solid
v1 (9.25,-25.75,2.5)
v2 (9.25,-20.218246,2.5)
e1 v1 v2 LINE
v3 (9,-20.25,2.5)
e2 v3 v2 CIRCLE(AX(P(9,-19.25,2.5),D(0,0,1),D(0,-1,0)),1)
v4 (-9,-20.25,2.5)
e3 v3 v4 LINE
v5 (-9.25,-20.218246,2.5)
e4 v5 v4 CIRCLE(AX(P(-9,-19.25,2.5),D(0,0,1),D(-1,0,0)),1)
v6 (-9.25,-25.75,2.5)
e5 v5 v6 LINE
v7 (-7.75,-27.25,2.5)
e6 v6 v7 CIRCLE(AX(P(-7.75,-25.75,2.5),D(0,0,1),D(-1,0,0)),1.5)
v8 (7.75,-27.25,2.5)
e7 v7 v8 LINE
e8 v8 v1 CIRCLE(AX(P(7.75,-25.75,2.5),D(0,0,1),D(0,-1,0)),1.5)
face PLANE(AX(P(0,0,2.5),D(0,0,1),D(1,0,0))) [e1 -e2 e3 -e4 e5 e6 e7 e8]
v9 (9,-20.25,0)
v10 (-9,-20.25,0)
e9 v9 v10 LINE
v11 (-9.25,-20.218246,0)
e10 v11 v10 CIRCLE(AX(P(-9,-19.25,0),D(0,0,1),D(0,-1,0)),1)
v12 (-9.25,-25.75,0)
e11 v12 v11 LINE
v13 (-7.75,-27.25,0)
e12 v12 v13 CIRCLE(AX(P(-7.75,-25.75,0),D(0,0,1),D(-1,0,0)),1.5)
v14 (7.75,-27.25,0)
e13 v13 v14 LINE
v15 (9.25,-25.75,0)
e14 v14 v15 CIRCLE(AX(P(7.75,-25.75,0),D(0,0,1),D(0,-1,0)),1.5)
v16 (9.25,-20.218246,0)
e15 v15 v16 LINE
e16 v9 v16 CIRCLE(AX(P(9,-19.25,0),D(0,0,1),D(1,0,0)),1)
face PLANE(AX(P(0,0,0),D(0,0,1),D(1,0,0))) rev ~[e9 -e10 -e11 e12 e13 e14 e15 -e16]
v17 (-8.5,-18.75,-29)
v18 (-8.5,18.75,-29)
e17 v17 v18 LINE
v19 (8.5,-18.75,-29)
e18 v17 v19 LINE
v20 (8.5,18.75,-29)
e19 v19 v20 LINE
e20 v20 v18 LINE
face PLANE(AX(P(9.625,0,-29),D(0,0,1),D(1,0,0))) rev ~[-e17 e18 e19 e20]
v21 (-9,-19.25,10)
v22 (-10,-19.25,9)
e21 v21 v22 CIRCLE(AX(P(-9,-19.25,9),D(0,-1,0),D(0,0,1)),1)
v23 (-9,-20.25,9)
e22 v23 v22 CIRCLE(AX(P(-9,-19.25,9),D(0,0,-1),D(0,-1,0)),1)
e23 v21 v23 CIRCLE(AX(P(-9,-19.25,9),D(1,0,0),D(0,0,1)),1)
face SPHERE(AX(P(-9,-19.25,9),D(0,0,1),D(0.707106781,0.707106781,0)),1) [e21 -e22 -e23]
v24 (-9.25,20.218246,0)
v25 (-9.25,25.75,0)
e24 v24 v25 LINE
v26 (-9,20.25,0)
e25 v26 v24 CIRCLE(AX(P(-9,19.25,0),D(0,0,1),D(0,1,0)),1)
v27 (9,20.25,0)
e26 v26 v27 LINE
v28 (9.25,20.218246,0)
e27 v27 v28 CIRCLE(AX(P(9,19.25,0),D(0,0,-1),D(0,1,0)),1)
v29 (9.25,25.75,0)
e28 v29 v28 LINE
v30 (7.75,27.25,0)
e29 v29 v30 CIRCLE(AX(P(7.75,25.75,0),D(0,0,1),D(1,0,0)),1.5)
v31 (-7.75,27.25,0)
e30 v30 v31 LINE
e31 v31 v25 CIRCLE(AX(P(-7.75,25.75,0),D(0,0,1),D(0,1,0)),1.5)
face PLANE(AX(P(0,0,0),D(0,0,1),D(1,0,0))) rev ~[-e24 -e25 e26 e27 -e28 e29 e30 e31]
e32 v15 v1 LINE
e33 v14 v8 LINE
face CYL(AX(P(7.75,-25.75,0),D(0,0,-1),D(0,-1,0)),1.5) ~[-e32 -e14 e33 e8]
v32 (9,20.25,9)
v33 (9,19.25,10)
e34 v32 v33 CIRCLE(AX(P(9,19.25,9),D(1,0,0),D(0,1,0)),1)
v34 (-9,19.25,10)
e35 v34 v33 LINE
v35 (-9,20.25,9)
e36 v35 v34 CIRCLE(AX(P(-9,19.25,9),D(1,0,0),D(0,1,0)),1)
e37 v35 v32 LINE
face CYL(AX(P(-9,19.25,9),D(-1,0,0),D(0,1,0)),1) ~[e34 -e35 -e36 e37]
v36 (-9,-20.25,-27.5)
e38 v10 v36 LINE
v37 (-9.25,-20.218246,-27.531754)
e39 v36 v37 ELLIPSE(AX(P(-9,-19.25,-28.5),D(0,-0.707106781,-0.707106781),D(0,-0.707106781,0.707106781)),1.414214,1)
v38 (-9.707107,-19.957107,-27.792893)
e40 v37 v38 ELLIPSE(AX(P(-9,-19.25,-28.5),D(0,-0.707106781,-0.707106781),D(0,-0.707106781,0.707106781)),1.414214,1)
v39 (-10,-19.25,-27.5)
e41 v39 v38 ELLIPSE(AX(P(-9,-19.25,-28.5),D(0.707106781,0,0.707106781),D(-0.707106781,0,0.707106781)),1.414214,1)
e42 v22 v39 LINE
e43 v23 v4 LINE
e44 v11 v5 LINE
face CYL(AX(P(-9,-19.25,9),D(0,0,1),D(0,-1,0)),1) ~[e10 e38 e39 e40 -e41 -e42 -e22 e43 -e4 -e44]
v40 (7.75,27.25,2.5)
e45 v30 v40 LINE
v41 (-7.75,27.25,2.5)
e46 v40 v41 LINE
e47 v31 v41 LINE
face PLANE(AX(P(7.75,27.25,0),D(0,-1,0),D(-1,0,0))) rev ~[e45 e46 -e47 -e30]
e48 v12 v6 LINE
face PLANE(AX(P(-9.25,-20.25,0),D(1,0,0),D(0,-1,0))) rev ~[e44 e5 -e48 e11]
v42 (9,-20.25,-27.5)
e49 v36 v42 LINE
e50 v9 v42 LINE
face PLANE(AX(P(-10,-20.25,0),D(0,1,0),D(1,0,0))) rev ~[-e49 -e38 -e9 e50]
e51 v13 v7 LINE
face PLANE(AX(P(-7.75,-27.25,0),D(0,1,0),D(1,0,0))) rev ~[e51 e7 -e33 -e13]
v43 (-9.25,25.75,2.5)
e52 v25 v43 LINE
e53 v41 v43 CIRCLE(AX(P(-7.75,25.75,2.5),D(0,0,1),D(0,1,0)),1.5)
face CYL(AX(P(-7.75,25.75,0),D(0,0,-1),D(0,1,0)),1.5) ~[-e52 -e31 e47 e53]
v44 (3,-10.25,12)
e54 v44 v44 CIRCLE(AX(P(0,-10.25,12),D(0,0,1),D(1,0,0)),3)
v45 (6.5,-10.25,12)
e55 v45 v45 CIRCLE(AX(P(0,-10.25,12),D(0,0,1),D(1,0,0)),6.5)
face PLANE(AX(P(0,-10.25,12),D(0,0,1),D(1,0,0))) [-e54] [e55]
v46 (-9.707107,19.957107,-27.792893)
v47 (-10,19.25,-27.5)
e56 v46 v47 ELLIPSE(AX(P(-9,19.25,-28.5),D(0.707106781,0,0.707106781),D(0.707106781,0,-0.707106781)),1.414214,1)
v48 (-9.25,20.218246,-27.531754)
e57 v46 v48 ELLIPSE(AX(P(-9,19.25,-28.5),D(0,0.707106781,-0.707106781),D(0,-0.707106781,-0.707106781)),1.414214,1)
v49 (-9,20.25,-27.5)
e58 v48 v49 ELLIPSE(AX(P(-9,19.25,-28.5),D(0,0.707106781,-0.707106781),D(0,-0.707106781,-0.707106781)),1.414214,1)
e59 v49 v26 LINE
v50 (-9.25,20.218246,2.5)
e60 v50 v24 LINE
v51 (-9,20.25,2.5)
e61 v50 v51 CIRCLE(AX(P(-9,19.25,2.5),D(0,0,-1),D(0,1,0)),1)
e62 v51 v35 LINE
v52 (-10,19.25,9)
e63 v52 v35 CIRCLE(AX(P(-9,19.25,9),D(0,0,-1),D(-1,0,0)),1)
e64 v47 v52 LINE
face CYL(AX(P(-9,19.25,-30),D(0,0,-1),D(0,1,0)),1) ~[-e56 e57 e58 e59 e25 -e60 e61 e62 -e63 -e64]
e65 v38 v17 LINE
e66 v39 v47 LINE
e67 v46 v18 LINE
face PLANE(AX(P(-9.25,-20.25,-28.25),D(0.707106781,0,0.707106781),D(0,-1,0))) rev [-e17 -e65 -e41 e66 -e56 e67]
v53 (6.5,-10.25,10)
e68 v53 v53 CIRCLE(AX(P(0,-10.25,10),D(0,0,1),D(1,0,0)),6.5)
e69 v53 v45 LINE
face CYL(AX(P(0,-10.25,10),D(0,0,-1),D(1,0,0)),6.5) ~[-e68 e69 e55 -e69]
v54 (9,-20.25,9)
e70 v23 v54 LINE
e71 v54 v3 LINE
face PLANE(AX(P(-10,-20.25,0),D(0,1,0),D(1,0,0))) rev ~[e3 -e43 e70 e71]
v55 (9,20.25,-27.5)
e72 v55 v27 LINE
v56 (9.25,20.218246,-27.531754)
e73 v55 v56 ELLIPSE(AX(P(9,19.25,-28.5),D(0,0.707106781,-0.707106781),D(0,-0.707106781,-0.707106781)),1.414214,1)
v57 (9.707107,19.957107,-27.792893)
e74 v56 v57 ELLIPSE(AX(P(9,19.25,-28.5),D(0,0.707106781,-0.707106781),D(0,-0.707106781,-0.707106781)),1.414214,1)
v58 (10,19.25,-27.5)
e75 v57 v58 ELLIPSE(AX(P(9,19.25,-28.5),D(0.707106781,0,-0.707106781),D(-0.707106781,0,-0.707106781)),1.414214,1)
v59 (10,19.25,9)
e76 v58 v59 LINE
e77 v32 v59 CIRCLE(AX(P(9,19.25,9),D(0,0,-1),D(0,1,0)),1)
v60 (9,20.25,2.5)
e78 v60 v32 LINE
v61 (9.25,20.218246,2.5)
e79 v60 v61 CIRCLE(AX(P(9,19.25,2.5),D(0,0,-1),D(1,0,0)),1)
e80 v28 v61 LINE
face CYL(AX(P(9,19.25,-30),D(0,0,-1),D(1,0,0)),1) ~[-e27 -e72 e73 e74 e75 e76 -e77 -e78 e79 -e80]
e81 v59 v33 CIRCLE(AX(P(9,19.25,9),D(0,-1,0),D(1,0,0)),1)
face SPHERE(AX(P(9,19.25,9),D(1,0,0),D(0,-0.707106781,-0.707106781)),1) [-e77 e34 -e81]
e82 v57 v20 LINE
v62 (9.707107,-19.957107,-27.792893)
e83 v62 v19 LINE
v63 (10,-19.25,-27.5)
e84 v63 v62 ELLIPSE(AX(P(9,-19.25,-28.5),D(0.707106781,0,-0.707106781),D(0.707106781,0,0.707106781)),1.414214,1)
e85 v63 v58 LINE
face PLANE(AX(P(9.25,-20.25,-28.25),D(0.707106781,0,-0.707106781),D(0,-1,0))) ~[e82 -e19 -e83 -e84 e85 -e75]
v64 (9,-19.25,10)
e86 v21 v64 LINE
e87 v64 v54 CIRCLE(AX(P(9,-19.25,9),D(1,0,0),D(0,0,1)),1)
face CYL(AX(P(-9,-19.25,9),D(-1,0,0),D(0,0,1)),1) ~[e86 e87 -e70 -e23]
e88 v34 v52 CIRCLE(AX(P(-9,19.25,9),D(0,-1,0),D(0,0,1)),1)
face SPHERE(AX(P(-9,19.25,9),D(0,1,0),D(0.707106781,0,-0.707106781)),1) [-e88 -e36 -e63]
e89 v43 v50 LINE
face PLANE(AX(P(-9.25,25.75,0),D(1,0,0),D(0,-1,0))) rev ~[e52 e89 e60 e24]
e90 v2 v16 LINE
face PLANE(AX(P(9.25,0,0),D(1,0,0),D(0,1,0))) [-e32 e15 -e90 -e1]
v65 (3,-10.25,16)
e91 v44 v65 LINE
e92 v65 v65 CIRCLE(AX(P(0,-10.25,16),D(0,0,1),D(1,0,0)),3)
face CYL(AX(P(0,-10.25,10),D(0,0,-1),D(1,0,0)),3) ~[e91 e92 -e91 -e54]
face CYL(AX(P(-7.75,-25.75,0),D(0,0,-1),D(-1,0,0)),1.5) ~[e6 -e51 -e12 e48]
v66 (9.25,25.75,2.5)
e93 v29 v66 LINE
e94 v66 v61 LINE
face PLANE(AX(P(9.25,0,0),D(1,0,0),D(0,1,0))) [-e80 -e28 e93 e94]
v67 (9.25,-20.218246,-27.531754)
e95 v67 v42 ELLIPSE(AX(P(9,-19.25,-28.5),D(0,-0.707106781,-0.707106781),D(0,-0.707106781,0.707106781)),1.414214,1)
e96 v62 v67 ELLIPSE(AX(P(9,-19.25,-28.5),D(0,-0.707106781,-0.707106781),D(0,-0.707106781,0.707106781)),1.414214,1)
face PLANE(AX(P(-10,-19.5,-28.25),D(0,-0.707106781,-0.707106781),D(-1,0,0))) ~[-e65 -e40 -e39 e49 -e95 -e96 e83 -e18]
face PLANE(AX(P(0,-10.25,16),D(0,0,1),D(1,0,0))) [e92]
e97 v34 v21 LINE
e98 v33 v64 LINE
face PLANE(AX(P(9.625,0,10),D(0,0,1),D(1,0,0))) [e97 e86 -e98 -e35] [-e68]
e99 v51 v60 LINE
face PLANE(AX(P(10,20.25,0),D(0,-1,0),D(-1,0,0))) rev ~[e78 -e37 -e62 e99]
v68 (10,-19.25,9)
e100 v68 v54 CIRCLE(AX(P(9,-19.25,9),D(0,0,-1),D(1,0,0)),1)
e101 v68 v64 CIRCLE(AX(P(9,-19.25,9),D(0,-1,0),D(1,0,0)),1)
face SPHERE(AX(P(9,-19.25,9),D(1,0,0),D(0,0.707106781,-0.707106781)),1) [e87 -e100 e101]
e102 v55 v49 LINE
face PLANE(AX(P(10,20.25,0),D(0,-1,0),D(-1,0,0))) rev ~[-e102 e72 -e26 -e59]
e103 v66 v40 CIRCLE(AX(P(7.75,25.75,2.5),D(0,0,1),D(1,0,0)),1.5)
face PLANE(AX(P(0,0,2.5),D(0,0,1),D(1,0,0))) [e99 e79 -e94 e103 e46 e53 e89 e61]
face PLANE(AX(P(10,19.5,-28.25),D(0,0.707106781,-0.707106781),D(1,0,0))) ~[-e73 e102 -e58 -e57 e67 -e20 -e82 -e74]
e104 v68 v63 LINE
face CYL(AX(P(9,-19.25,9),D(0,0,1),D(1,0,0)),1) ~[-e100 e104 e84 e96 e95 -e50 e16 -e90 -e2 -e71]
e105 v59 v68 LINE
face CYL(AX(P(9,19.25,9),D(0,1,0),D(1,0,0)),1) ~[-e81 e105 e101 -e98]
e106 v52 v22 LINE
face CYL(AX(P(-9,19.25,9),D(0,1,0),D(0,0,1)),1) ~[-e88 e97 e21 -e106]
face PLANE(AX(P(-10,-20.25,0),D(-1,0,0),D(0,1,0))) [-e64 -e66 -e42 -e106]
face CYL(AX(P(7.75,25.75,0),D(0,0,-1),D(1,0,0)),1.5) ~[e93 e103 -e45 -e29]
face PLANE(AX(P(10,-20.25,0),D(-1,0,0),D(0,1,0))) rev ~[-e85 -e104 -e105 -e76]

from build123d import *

# Parameters (mm, degrees)
F0_W          = 0.75
F0_H          = 40.5
F0_W_2        = 18.5
F1_DEPTH      = 29
F1_DEPTH_BACK = 10
F2_DEPTH      = 2.5
F3_R          = 6.5
F3_R_2        = 3
F4_DEPTH      = 2
F5_DEPTH      = 6
F6_SIZE       = 1.5
F7_T1_DEPTH   = 38.5
F7_T3_DEPTH   = 18
F7_S7_W       = 1
F7_S7_H       = 1
F7_T8_DEPTH   = 1
F7_S13_W      = 1
F7_S13_H      = 1
F7_T14_DEPTH  = 1
F7_S19_W      = 1
F7_S19_H      = 1
F7_T20_DEPTH  = 1
F7_S25_W      = 1
F7_S25_H      = 1
F7_T26_DEPTH  = 1
F7_T32_DEPTH  = 39
F7_T38_DEPTH  = 39
F7_T44_DEPTH  = 39
F7_T51_DEPTH  = 39
F7_T57_DEPTH  = 39
F7_T63_DEPTH  = 39
F7_T69_DEPTH  = 39
F7_T75_DEPTH  = 39
F7_T82_DEPTH  = 39
F7_T88_DEPTH  = 39
F7_T94_DEPTH  = 39
F7_T100_DEPTH = 39
F7_T106_DEPTH = 39
F7_T113_DEPTH = 39
F7_T119_DEPTH = 39
F7_T125_DEPTH = 39
F7_T131_DEPTH = 39
F7_T137_DEPTH = 39
F7_T144_DEPTH = 39
F7_T150_DEPTH = 39


# Not quite as in the source:
# - a fillet or chamfer that OpenCascade refuses, or shapes differently, is made with other operations: its cross-section is extruded or revolved along the edge and cut away or added


with BuildPart() as f1:
    # F0 (on Top) → F1 (new body, two sides)
    with BuildSketch(Plane.XY) as f1_sk:
        with Locations((9.625, 0)):
            Rectangle(F0_W, F0_H)
        Rectangle(F0_W_2, F0_H)
        with Locations((-9.625, 0)):
            Rectangle(F0_W, F0_H)
    extrude(amount=-F1_DEPTH)
    extrude(f1_sk.sketch, amount=F1_DEPTH_BACK)

    # F0 (on Top) → F2 (join)
    with BuildSketch(Plane.XY):
        with BuildLine():
            Line((9.25, -25.75), (9.25, -20.25))
            Line((9.25, -20.25), (-9.25, -20.25))
            Line((-9.25, -20.25), (-9.25, -25.75))
            ThreePointArc((-9.25, -25.75), (-8.8106601718, -26.8106601718), (-7.75, -27.25))
            Line((-7.75, -27.25), (7.75, -27.25))
            ThreePointArc((7.75, -27.25), (8.8106601718, -26.8106601718), (9.25, -25.75))
        make_face()
        with BuildLine():
            Line((-9.25, 20.25), (9.25, 20.25))
            Line((9.25, 20.25), (9.25, 25.75))
            ThreePointArc((9.25, 25.75), (8.8106601718, 26.8106601718), (7.75, 27.25))
            Line((7.75, 27.25), (-7.75, 27.25))
            ThreePointArc((-7.75, 27.25), (-8.8106601718, 26.8106601718), (-9.25, 25.75))
            Line((-9.25, 25.75), (-9.25, 20.25))
        make_face()
    extrude(amount=F2_DEPTH)

    # F3 (on face) → F4 (join)
    with BuildSketch(Plane.XY.offset(10)):
        with Locations((0, -10.25)):
            Circle(F3_R)
        with Locations((0, -10.25)):
            Circle(F3_R_2, mode=Mode.SUBTRACT)
    extrude(amount=F4_DEPTH)

    # F3 (on face) → F5 (join)
    with BuildSketch(Plane.XY.offset(10)):
        with Locations((0, -10.25)):
            Circle(F3_R_2)
    extrude(amount=F5_DEPTH)

    # F6
    f6_edges = [f1.edges().sort_by_distance(p)[0] for p in [
        (10, 0, -29),
        (0, 20.25, -29),
        (-10, 0, -29),
        (0, -20.25, -29),
    ]]
    chamfer(f6_edges, length=F6_SIZE)

    # F7: fillet of radius 1 on 8 edges, made by hand

    # F7_s2 → F7_t1 (cut)
    with BuildSketch(Plane.XZ.offset(-19.25)):
        with BuildLine():
            ThreePointArc((-9, 10), (-9.7071067812, 9.7071067812), (-10, 9))
            Line((-10, 9), (-10, 10))
            Line((-10, 10), (-9, 10))
        make_face()
        with BuildLine():
            ThreePointArc((10, 9), (9.7071067812, 9.7071067812), (9, 10))
            Line((9, 10), (10, 10))
            Line((10, 10), (10, 9))
        make_face()
    extrude(amount=F7_T1_DEPTH, mode=Mode.SUBTRACT)

    # F7_s4 → F7_t3 (cut)
    with BuildSketch(Plane.YZ.offset(-9)):
        with BuildLine():
            ThreePointArc((20.25, 9), (19.9571067812, 9.7071067812), (19.25, 10))
            Line((19.25, 10), (20.25, 10))
            Line((20.25, 10), (20.25, 9))
        make_face()
        with BuildLine():
            ThreePointArc((-19.25, 10), (-19.9571067812, 9.7071067812), (-20.25, 9))
            Line((-20.25, 9), (-20.25, 10))
            Line((-20.25, 10), (-19.25, 10))
        make_face()
    extrude(amount=F7_T3_DEPTH, mode=Mode.SUBTRACT)


with BuildPart() as f7_tool6:
    # F7_s7 → F7_t8 (new body)
    with BuildSketch(Plane.XZ.offset(-19.25)):
        with Locations((-9.5, 9.5)):
            Rectangle(F7_S7_W, F7_S7_H)
    extrude(amount=-F7_T8_DEPTH)

    # F7_s9 → F7_t10 (revolve, cut)
    with BuildSketch(Plane(origin=(-9, 19.25, 9), x_dir=(0.7071067812, 0, -0.7071067812), z_dir=(0.7071067812, 0, 0.7071067812))):
        with BuildLine():
            ThreePointArc((0, -1), (1, 0), (0, 1))
            Line((0, 1), (0, -1))
        make_face()
    revolve(axis=Axis((-9, 19.25, 9), (0, 1, 0)), mode=Mode.SUBTRACT)


with BuildPart() as f1_1:
    add(f1.part)

    # F7_t5: cut F7_tool6
    add(f7_tool6.part, mode=Mode.SUBTRACT)


with BuildPart() as f7_tool12:
    # F7_s13 → F7_t14 (new body)
    with BuildSketch(Plane.XY.offset(9)):
        with Locations((-9.5, -19.75)):
            Rectangle(F7_S13_W, F7_S13_H)
    extrude(amount=F7_T14_DEPTH)

    # F7_s15 → F7_t16 (revolve, cut)
    with BuildSketch(Plane(origin=(-9, -19.25, 9), x_dir=(0.7071067812, 0.7071067812, 0), z_dir=(0.7071067812, -0.7071067812, 0))):
        with BuildLine():
            ThreePointArc((0, -1), (1, 0), (0, 1))
            Line((0, 1), (0, -1))
        make_face()
    revolve(axis=Axis((-9, -19.25, 9), (0, 0, 1)), mode=Mode.SUBTRACT)


with BuildPart() as f1_2:
    add(f1_1.part)

    # F7_t11: cut F7_tool12
    add(f7_tool12.part, mode=Mode.SUBTRACT)


with BuildPart() as f7_tool18:
    # F7_s19 → F7_t20 (new body)
    with BuildSketch(Plane.YZ.offset(9)):
        with Locations((19.75, 9.5)):
            Rectangle(F7_S19_W, F7_S19_H)
    extrude(amount=F7_T20_DEPTH)

    # F7_s21 → F7_t22 (revolve, cut)
    with BuildSketch(Plane(origin=(9, 19.25, 9), x_dir=(0, -0.7071067812, -0.7071067812), z_dir=(0, -0.7071067812, 0.7071067812))):
        with BuildLine():
            ThreePointArc((0, -1), (1, 0), (0, 1))
            Line((0, 1), (0, -1))
        make_face()
    revolve(axis=Axis((9, 19.25, 9), (1, 0, 0)), mode=Mode.SUBTRACT)


with BuildPart() as f1_3:
    add(f1_2.part)

    # F7_t17: cut F7_tool18
    add(f7_tool18.part, mode=Mode.SUBTRACT)


with BuildPart() as f7_tool24:
    # F7_s25 → F7_t26 (new body)
    with BuildSketch(Plane.YZ.offset(9)):
        with Locations((-19.75, 9.5)):
            Rectangle(F7_S25_W, F7_S25_H)
    extrude(amount=F7_T26_DEPTH)

    # F7_s27 → F7_t28 (revolve, cut)
    with BuildSketch(Plane(origin=(9, -19.25, 9), x_dir=(0, 0.7071067812, -0.7071067812), z_dir=(0, -0.7071067812, -0.7071067812))):
        with BuildLine():
            ThreePointArc((0, -1), (1, 0), (0, 1))
            Line((0, 1), (0, -1))
        make_face()
    revolve(axis=Axis((9, -19.25, 9), (1, 0, 0)), mode=Mode.SUBTRACT)


with BuildPart() as f1_4:
    add(f1_3.part)

    # F7_t23: cut F7_tool24
    add(f7_tool24.part, mode=Mode.SUBTRACT)


with BuildPart() as f7_tool30:
    # F7_s31 → F7_t32 (new body)
    with BuildSketch(Plane.XY.offset(-30)):
        with BuildLine():
            ThreePointArc((10, 19.25), (9.7071067812, 19.9571067812), (9, 20.25))
            Line((9, 20.25), (10, 20.25))
            Line((10, 20.25), (10, 19.25))
        make_face()
    extrude(amount=F7_T32_DEPTH)

    split(bisect_by=Plane.YZ.offset(9.25), keep=Keep.TOP)

    split(bisect_by=Plane.XY, keep=Keep.BOTTOM)


with BuildPart() as f1_5:
    add(f1_4.part)

    # F7_t29: cut F7_tool30
    add(f7_tool30.part, mode=Mode.SUBTRACT)


with BuildPart() as f7_tool36:
    # F7_s37 → F7_t38 (new body)
    with BuildSketch(Plane.XY.offset(-30)):
        with BuildLine():
            ThreePointArc((10, 19.25), (9.7071067812, 19.9571067812), (9, 20.25))
            Line((9, 20.25), (10, 20.25))
            Line((10, 20.25), (10, 19.25))
        make_face()
    extrude(amount=F7_T38_DEPTH)

    split(bisect_by=Plane.YZ.offset(9.25), keep=Keep.BOTTOM)

    split(bisect_by=Plane.XY, keep=Keep.BOTTOM)


with BuildPart() as f1_6:
    add(f1_5.part)

    # F7_t35: cut F7_tool36
    add(f7_tool36.part, mode=Mode.SUBTRACT)


with BuildPart() as f7_tool42:
    # F7_s43 → F7_t44 (new body)
    with BuildSketch(Plane.XY.offset(-30)):
        with BuildLine():
            ThreePointArc((10, 19.25), (9.7071067812, 19.9571067812), (9, 20.25))
            Line((9, 20.25), (10, 20.25))
            Line((10, 20.25), (10, 19.25))
        make_face()
    extrude(amount=F7_T44_DEPTH)

    split(bisect_by=Plane.XY.offset(2.5), keep=Keep.BOTTOM)

    split(bisect_by=Plane.YZ.offset(9.25), keep=Keep.TOP)

    split(bisect_by=Plane.XY, keep=Keep.TOP)


with BuildPart() as f1_7:
    add(f1_6.part)

    # F7_t41: cut F7_tool42
    add(f7_tool42.part, mode=Mode.SUBTRACT)


with BuildPart() as f7_tool49:
    # F7_s50 → F7_t51 (new body)
    with BuildSketch(Plane.XY.offset(-30)):
        with BuildLine():
            ThreePointArc((10, 19.25), (9.7071067812, 19.9571067812), (9, 20.25))
            Line((9, 20.25), (10, 20.25))
            Line((10, 20.25), (10, 19.25))
        make_face()
    extrude(amount=F7_T51_DEPTH)

    split(bisect_by=Plane.XY.offset(2.5), keep=Keep.TOP)

    split(bisect_by=Plane.YZ.offset(9.25), keep=Keep.TOP)


with BuildPart() as f1_8:
    add(f1_7.part)

    # F7_t48: cut F7_tool49
    add(f7_tool49.part, mode=Mode.SUBTRACT)


with BuildPart() as f7_tool55:
    # F7_s56 → F7_t57 (new body)
    with BuildSketch(Plane.XY.offset(-30)):
        with BuildLine():
            ThreePointArc((10, 19.25), (9.7071067812, 19.9571067812), (9, 20.25))
            Line((9, 20.25), (10, 20.25))
            Line((10, 20.25), (10, 19.25))
        make_face()
    extrude(amount=F7_T57_DEPTH)

    split(bisect_by=Plane.XY.offset(2.5), keep=Keep.TOP)

    split(bisect_by=Plane.YZ.offset(9.25), keep=Keep.BOTTOM)


with BuildPart() as f1_9:
    add(f1_8.part)

    # F7_t54: cut F7_tool55
    add(f7_tool55.part, mode=Mode.SUBTRACT)


with BuildPart() as f7_tool61:
    # F7_s62 → F7_t63 (new body)
    with BuildSketch(Plane.XY.offset(9)):
        with BuildLine():
            ThreePointArc((-9, -20.25), (-9.7071067812, -19.9571067812), (-10, -19.25))
            Line((-10, -19.25), (-10, -20.25))
            Line((-10, -20.25), (-9, -20.25))
        make_face()
    extrude(amount=-F7_T63_DEPTH)

    split(bisect_by=Plane.XY.offset(2.5), keep=Keep.TOP)

    split(bisect_by=Plane.YZ.offset(-9.25), keep=Keep.TOP)


with BuildPart() as f1_10:
    add(f1_9.part)

    # F7_t60: cut F7_tool61
    add(f7_tool61.part, mode=Mode.SUBTRACT)


with BuildPart() as f7_tool67:
    # F7_s68 → F7_t69 (new body)
    with BuildSketch(Plane.XY.offset(9)):
        with BuildLine():
            ThreePointArc((-9, -20.25), (-9.7071067812, -19.9571067812), (-10, -19.25))
            Line((-10, -19.25), (-10, -20.25))
            Line((-10, -20.25), (-9, -20.25))
        make_face()
    extrude(amount=-F7_T69_DEPTH)

    split(bisect_by=Plane.XY.offset(2.5), keep=Keep.TOP)

    split(bisect_by=Plane.YZ.offset(-9.25), keep=Keep.BOTTOM)


with BuildPart() as f1_11:
    add(f1_10.part)

    # F7_t66: cut F7_tool67
    add(f7_tool67.part, mode=Mode.SUBTRACT)


with BuildPart() as f7_tool73:
    # F7_s74 → F7_t75 (new body)
    with BuildSketch(Plane.XY.offset(9)):
        with BuildLine():
            ThreePointArc((-9, -20.25), (-9.7071067812, -19.9571067812), (-10, -19.25))
            Line((-10, -19.25), (-10, -20.25))
            Line((-10, -20.25), (-9, -20.25))
        make_face()
    extrude(amount=-F7_T75_DEPTH)

    split(bisect_by=Plane.XY.offset(2.5), keep=Keep.BOTTOM)

    split(bisect_by=Plane.YZ.offset(-9.25), keep=Keep.BOTTOM)

    split(bisect_by=Plane.XY, keep=Keep.TOP)


with BuildPart() as f1_12:
    add(f1_11.part)

    # F7_t72: cut F7_tool73
    add(f7_tool73.part, mode=Mode.SUBTRACT)


with BuildPart() as f7_tool80:
    # F7_s81 → F7_t82 (new body)
    with BuildSketch(Plane.XY.offset(9)):
        with BuildLine():
            ThreePointArc((-9, -20.25), (-9.7071067812, -19.9571067812), (-10, -19.25))
            Line((-10, -19.25), (-10, -20.25))
            Line((-10, -20.25), (-9, -20.25))
        make_face()
    extrude(amount=-F7_T82_DEPTH)

    split(bisect_by=Plane.YZ.offset(-9.25), keep=Keep.TOP)

    split(bisect_by=Plane.XY, keep=Keep.BOTTOM)


with BuildPart() as f1_13:
    add(f1_12.part)

    # F7_t79: cut F7_tool80
    add(f7_tool80.part, mode=Mode.SUBTRACT)


with BuildPart() as f7_tool86:
    # F7_s87 → F7_t88 (new body)
    with BuildSketch(Plane.XY.offset(9)):
        with BuildLine():
            ThreePointArc((-9, -20.25), (-9.7071067812, -19.9571067812), (-10, -19.25))
            Line((-10, -19.25), (-10, -20.25))
            Line((-10, -20.25), (-9, -20.25))
        make_face()
    extrude(amount=-F7_T88_DEPTH)

    split(bisect_by=Plane.YZ.offset(-9.25), keep=Keep.BOTTOM)

    split(bisect_by=Plane.XY, keep=Keep.BOTTOM)


with BuildPart() as f1_14:
    add(f1_13.part)

    # F7_t85: cut F7_tool86
    add(f7_tool86.part, mode=Mode.SUBTRACT)


with BuildPart() as f7_tool92:
    # F7_s93 → F7_t94 (new body)
    with BuildSketch(Plane.XY.offset(9)):
        with BuildLine():
            ThreePointArc((10, -19.25), (9.7071067812, -19.9571067812), (9, -20.25))
            Line((9, -20.25), (10, -20.25))
            Line((10, -20.25), (10, -19.25))
        make_face()
    extrude(amount=-F7_T94_DEPTH)

    split(bisect_by=Plane.YZ.offset(9.25), keep=Keep.TOP)

    split(bisect_by=Plane.XY.offset(2.5), keep=Keep.TOP)


with BuildPart() as f1_15:
    add(f1_14.part)

    # F7_t91: cut F7_tool92
    add(f7_tool92.part, mode=Mode.SUBTRACT)


with BuildPart() as f7_tool98:
    # F7_s99 → F7_t100 (new body)
    with BuildSketch(Plane.XY.offset(9)):
        with BuildLine():
            ThreePointArc((10, -19.25), (9.7071067812, -19.9571067812), (9, -20.25))
            Line((9, -20.25), (10, -20.25))
            Line((10, -20.25), (10, -19.25))
        make_face()
    extrude(amount=-F7_T100_DEPTH)

    split(bisect_by=Plane.YZ.offset(9.25), keep=Keep.BOTTOM)

    split(bisect_by=Plane.XY.offset(2.5), keep=Keep.TOP)


with BuildPart() as f1_16:
    add(f1_15.part)

    # F7_t97: cut F7_tool98
    add(f7_tool98.part, mode=Mode.SUBTRACT)


with BuildPart() as f7_tool104:
    # F7_s105 → F7_t106 (new body)
    with BuildSketch(Plane.XY.offset(9)):
        with BuildLine():
            ThreePointArc((10, -19.25), (9.7071067812, -19.9571067812), (9, -20.25))
            Line((9, -20.25), (10, -20.25))
            Line((10, -20.25), (10, -19.25))
        make_face()
    extrude(amount=-F7_T106_DEPTH)

    split(bisect_by=Plane.YZ.offset(9.25), keep=Keep.TOP)

    split(bisect_by=Plane.XY.offset(2.5), keep=Keep.BOTTOM)

    split(bisect_by=Plane.XY, keep=Keep.TOP)


with BuildPart() as f1_17:
    add(f1_16.part)

    # F7_t103: cut F7_tool104
    add(f7_tool104.part, mode=Mode.SUBTRACT)


with BuildPart() as f7_tool111:
    # F7_s112 → F7_t113 (new body)
    with BuildSketch(Plane.XY.offset(9)):
        with BuildLine():
            ThreePointArc((10, -19.25), (9.7071067812, -19.9571067812), (9, -20.25))
            Line((9, -20.25), (10, -20.25))
            Line((10, -20.25), (10, -19.25))
        make_face()
    extrude(amount=-F7_T113_DEPTH)

    split(bisect_by=Plane.YZ.offset(9.25), keep=Keep.TOP)

    split(bisect_by=Plane.XY, keep=Keep.BOTTOM)


with BuildPart() as f1_18:
    add(f1_17.part)

    # F7_t110: cut F7_tool111
    add(f7_tool111.part, mode=Mode.SUBTRACT)


with BuildPart() as f7_tool117:
    # F7_s118 → F7_t119 (new body)
    with BuildSketch(Plane.XY.offset(9)):
        with BuildLine():
            ThreePointArc((10, -19.25), (9.7071067812, -19.9571067812), (9, -20.25))
            Line((9, -20.25), (10, -20.25))
            Line((10, -20.25), (10, -19.25))
        make_face()
    extrude(amount=-F7_T119_DEPTH)

    split(bisect_by=Plane.YZ.offset(9.25), keep=Keep.BOTTOM)

    split(bisect_by=Plane.XY, keep=Keep.BOTTOM)


with BuildPart() as f1_19:
    add(f1_18.part)

    # F7_t116: cut F7_tool117
    add(f7_tool117.part, mode=Mode.SUBTRACT)


with BuildPart() as f7_tool123:
    # F7_s124 → F7_t125 (new body)
    with BuildSketch(Plane.XY.offset(-30)):
        with BuildLine():
            ThreePointArc((-9, 20.25), (-9.7071067812, 19.9571067812), (-10, 19.25))
            Line((-10, 19.25), (-10, 20.25))
            Line((-10, 20.25), (-9, 20.25))
        make_face()
    extrude(amount=F7_T125_DEPTH)

    split(bisect_by=Plane.YZ.offset(-9.25), keep=Keep.TOP)

    split(bisect_by=Plane.XY, keep=Keep.BOTTOM)


with BuildPart() as f1_20:
    add(f1_19.part)

    # F7_t122: cut F7_tool123
    add(f7_tool123.part, mode=Mode.SUBTRACT)


with BuildPart() as f7_tool129:
    # F7_s130 → F7_t131 (new body)
    with BuildSketch(Plane.XY.offset(-30)):
        with BuildLine():
            ThreePointArc((-9, 20.25), (-9.7071067812, 19.9571067812), (-10, 19.25))
            Line((-10, 19.25), (-10, 20.25))
            Line((-10, 20.25), (-9, 20.25))
        make_face()
    extrude(amount=F7_T131_DEPTH)

    split(bisect_by=Plane.YZ.offset(-9.25), keep=Keep.BOTTOM)

    split(bisect_by=Plane.XY, keep=Keep.BOTTOM)


with BuildPart() as f1_21:
    add(f1_20.part)

    # F7_t128: cut F7_tool129
    add(f7_tool129.part, mode=Mode.SUBTRACT)


with BuildPart() as f7_tool135:
    # F7_s136 → F7_t137 (new body)
    with BuildSketch(Plane.XY.offset(-30)):
        with BuildLine():
            ThreePointArc((-9, 20.25), (-9.7071067812, 19.9571067812), (-10, 19.25))
            Line((-10, 19.25), (-10, 20.25))
            Line((-10, 20.25), (-9, 20.25))
        make_face()
    extrude(amount=F7_T137_DEPTH)

    split(bisect_by=Plane.YZ.offset(-9.25), keep=Keep.BOTTOM)

    split(bisect_by=Plane.XY.offset(2.5), keep=Keep.BOTTOM)

    split(bisect_by=Plane.XY, keep=Keep.TOP)


with BuildPart() as f1_22:
    add(f1_21.part)

    # F7_t134: cut F7_tool135
    add(f7_tool135.part, mode=Mode.SUBTRACT)


with BuildPart() as f7_tool142:
    # F7_s143 → F7_t144 (new body)
    with BuildSketch(Plane.XY.offset(-30)):
        with BuildLine():
            ThreePointArc((-9, 20.25), (-9.7071067812, 19.9571067812), (-10, 19.25))
            Line((-10, 19.25), (-10, 20.25))
            Line((-10, 20.25), (-9, 20.25))
        make_face()
    extrude(amount=F7_T144_DEPTH)

    split(bisect_by=Plane.YZ.offset(-9.25), keep=Keep.TOP)

    split(bisect_by=Plane.XY.offset(2.5), keep=Keep.TOP)


with BuildPart() as f1_23:
    add(f1_22.part)

    # F7_t141: cut F7_tool142
    add(f7_tool142.part, mode=Mode.SUBTRACT)


with BuildPart() as f7_tool148:
    # F7_s149 → F7_t150 (new body)
    with BuildSketch(Plane.XY.offset(-30)):
        with BuildLine():
            ThreePointArc((-9, 20.25), (-9.7071067812, 19.9571067812), (-10, 19.25))
            Line((-10, 19.25), (-10, 20.25))
            Line((-10, 20.25), (-9, 20.25))
        make_face()
    extrude(amount=F7_T150_DEPTH)

    split(bisect_by=Plane.YZ.offset(-9.25), keep=Keep.BOTTOM)

    split(bisect_by=Plane.XY.offset(2.5), keep=Keep.TOP)


with BuildPart() as f1_24:
    add(f1_23.part)

    # F7_t147: cut F7_tool148
    add(f7_tool148.part, mode=Mode.SUBTRACT)


solid = f1_24.part
